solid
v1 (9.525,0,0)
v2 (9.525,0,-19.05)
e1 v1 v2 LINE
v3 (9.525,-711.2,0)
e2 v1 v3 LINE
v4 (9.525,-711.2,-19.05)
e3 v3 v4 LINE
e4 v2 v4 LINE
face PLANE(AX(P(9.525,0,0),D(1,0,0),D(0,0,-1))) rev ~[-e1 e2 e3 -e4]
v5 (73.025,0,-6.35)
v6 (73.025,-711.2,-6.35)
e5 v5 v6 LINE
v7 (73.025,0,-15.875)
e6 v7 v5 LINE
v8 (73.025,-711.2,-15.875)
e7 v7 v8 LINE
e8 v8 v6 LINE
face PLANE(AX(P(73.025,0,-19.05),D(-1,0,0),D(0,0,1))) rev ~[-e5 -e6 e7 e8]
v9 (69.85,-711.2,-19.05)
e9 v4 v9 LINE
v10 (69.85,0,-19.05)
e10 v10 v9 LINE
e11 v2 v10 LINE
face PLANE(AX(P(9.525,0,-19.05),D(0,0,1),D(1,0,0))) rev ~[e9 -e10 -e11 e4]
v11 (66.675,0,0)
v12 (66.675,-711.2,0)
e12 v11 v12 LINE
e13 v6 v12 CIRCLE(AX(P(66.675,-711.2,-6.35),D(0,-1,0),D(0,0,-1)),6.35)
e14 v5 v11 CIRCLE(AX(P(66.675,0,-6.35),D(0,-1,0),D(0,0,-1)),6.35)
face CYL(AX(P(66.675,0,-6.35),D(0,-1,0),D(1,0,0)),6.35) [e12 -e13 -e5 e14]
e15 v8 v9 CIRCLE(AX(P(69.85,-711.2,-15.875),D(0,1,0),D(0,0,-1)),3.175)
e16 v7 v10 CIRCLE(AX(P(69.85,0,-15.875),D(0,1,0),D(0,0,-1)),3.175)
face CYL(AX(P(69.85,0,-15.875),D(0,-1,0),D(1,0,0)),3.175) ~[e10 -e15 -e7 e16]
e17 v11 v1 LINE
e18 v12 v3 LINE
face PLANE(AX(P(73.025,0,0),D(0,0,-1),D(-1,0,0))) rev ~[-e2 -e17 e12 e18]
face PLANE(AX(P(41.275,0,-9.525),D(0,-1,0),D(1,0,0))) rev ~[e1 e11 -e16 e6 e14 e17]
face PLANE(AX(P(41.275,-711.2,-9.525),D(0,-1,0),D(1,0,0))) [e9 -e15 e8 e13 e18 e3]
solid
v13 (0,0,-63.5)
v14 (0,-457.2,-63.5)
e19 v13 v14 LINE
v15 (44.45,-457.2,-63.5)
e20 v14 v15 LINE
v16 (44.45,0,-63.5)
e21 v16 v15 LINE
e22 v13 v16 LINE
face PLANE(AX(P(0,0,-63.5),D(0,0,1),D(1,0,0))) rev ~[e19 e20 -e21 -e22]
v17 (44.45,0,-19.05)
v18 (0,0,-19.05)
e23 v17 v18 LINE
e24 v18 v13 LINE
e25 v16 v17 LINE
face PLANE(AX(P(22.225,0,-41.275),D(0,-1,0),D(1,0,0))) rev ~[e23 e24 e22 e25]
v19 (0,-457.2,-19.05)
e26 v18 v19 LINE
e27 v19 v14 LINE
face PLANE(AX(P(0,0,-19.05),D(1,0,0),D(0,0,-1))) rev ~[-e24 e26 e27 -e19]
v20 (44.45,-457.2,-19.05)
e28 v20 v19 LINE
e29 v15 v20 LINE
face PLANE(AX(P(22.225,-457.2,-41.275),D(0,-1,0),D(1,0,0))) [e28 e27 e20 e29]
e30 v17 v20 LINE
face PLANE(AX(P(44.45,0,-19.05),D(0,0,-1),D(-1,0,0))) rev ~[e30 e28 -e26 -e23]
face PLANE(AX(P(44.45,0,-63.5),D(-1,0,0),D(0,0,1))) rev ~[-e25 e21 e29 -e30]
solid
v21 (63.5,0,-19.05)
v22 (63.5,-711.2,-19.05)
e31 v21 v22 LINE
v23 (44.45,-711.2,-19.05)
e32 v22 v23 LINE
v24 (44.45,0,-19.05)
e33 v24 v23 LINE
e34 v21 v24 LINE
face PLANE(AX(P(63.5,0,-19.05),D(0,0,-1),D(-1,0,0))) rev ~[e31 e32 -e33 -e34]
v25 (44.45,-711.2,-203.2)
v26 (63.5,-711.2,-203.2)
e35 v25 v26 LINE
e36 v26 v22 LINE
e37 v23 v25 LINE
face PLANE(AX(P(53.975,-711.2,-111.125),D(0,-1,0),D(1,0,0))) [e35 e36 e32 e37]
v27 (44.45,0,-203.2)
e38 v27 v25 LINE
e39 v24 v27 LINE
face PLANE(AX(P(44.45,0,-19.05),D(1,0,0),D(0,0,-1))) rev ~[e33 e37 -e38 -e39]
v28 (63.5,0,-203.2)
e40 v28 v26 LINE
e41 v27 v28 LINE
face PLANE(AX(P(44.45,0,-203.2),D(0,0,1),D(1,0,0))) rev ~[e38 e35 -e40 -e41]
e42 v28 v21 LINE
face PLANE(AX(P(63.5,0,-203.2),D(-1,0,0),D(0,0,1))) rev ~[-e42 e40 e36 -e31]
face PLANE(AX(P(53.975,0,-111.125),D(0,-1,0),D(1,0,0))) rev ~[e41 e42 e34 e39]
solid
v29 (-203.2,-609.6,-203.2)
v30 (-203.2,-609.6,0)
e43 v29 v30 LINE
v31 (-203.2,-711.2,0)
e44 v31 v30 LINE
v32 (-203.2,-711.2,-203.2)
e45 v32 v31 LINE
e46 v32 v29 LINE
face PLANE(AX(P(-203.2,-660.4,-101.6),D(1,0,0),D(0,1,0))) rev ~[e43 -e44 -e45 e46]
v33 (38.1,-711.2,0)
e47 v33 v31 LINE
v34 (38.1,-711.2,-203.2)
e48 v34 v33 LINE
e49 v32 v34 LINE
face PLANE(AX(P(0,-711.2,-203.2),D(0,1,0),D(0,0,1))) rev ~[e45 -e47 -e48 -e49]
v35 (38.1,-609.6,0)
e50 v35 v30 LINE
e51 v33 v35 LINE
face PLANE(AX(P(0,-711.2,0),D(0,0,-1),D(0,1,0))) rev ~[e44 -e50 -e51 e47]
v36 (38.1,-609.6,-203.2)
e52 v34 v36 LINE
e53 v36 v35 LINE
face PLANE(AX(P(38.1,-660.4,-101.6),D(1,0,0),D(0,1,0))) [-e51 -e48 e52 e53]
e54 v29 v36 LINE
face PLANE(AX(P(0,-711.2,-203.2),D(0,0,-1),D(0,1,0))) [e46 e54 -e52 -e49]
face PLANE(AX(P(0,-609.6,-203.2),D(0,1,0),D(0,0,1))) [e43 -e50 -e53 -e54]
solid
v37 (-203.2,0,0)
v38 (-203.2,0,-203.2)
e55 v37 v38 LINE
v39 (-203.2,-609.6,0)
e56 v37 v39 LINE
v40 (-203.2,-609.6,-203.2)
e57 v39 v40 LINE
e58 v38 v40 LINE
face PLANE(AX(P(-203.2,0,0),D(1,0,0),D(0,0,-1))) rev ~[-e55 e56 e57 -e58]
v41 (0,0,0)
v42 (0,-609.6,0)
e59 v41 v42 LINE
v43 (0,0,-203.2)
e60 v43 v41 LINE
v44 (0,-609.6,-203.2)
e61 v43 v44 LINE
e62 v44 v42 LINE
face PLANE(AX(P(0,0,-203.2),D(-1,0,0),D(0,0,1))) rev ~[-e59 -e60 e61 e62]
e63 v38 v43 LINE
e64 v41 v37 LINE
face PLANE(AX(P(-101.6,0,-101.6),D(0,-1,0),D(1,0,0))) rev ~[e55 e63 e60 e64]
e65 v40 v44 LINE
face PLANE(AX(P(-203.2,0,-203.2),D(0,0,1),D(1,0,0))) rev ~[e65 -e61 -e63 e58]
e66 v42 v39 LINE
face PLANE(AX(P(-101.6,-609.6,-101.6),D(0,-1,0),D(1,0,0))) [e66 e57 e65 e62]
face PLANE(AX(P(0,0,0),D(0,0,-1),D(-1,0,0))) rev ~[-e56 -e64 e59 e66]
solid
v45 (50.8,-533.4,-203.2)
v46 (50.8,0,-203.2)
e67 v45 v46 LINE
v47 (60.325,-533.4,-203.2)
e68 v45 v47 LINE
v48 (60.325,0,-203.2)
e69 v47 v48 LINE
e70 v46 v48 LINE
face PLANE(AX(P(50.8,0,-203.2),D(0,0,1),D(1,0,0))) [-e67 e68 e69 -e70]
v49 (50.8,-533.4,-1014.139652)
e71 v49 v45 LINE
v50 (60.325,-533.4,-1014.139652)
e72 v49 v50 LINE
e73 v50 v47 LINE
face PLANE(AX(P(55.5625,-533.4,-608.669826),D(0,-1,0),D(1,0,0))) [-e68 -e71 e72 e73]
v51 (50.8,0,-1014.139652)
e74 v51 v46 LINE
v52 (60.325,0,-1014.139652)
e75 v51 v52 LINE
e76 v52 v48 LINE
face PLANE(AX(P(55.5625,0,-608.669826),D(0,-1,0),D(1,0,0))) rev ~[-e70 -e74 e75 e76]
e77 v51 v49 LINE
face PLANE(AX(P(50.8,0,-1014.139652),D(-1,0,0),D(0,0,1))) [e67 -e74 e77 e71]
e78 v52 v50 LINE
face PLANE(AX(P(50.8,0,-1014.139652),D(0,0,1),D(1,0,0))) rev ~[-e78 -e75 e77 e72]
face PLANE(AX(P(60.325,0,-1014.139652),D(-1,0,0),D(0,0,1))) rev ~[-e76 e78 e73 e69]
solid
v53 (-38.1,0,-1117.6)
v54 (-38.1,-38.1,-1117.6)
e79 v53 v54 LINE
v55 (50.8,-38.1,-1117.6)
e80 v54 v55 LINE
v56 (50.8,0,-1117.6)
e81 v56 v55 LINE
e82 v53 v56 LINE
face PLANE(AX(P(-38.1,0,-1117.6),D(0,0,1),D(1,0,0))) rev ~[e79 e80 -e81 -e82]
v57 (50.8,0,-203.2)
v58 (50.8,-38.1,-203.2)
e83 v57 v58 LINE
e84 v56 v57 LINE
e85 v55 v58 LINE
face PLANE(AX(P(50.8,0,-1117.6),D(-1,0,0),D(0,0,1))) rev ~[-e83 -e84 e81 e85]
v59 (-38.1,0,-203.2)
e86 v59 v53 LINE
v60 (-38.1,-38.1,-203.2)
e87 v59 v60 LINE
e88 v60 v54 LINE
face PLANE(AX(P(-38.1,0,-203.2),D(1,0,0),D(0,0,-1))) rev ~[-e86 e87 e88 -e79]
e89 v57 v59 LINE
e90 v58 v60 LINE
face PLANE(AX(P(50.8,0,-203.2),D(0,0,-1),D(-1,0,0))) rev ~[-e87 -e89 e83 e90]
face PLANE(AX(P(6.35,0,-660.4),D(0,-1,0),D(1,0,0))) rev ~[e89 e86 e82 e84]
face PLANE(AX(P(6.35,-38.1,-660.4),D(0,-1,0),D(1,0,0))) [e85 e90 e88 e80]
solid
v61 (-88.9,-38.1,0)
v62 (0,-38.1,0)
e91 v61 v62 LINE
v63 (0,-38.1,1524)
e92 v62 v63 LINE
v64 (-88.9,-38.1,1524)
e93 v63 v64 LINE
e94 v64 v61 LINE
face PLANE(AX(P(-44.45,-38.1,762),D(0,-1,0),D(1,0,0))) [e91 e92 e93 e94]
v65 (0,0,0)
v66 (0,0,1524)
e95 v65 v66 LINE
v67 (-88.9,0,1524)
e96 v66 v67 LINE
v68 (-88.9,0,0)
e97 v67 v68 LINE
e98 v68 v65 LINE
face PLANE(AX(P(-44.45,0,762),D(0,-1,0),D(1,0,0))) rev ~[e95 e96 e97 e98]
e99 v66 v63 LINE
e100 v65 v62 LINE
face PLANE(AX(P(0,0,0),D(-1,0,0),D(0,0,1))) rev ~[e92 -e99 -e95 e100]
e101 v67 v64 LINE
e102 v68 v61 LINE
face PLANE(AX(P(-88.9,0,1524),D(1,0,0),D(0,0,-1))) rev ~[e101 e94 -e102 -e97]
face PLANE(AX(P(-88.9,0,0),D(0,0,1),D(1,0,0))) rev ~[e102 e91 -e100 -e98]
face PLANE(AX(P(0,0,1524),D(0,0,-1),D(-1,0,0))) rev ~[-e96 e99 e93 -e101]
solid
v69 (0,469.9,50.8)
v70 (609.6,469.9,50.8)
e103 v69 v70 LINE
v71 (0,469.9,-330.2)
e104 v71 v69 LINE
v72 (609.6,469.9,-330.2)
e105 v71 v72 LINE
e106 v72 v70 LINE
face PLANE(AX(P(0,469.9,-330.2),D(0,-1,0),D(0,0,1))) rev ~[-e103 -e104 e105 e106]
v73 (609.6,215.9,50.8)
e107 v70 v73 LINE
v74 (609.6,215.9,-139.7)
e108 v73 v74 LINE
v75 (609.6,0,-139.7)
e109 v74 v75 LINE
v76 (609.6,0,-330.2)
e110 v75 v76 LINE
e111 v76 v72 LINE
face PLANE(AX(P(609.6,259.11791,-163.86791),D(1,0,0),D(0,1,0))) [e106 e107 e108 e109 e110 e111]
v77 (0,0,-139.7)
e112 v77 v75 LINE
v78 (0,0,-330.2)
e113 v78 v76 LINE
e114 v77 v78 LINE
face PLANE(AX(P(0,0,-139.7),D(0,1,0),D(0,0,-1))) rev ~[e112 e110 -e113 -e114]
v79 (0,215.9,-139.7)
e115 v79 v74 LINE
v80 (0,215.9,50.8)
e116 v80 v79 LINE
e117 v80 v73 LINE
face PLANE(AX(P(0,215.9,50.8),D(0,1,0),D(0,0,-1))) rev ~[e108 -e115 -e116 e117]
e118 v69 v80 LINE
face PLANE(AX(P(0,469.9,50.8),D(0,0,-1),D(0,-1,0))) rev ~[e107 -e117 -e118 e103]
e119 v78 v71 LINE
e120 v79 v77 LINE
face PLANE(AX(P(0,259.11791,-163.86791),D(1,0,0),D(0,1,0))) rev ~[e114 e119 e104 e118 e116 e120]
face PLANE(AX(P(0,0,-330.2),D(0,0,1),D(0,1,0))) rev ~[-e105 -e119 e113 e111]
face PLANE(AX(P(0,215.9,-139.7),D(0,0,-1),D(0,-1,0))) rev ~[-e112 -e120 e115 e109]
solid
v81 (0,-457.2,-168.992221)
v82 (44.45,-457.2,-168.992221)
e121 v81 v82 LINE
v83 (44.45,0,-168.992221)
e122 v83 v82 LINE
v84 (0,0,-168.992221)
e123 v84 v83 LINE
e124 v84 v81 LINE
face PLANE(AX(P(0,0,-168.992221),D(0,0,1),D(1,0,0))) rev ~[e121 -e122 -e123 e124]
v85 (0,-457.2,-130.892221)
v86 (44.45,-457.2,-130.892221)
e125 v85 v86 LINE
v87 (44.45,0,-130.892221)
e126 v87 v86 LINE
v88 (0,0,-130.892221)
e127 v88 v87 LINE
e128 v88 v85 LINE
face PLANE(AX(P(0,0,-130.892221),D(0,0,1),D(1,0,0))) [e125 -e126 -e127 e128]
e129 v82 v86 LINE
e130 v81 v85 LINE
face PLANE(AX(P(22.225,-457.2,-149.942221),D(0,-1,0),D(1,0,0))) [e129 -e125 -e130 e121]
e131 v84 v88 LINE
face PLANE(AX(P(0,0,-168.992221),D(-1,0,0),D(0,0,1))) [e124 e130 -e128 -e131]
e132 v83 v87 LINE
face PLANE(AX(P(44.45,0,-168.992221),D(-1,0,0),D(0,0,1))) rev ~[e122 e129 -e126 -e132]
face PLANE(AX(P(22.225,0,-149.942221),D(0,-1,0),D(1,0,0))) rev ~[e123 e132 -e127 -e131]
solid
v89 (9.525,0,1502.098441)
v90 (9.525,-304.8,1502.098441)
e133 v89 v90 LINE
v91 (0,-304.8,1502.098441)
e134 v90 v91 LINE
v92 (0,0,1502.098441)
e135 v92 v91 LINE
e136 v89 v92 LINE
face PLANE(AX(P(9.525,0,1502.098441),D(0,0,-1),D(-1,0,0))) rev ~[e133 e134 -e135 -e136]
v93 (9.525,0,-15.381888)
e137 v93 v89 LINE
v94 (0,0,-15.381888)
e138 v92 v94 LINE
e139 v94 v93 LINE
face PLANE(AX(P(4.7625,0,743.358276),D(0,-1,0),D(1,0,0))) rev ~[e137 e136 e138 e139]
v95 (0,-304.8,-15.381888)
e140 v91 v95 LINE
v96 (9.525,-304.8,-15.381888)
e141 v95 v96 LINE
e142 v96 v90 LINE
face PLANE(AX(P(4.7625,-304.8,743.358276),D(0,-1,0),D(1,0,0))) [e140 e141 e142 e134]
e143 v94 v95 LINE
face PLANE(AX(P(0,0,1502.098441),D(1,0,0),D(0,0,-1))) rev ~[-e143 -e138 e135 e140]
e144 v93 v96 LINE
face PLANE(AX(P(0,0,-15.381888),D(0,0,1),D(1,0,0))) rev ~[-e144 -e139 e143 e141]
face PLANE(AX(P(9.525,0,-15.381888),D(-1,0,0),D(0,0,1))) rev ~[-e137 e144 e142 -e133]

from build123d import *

# Parameters (mm, degrees)
F1_DEPTH      = 38.1
F2_DEPTH      = 304.8
F0_W          = 9.525
F0_H          = 810.9396522522
F3_DEPTH      = 609.6
F4_DEPTH      = 457.2
F0_W_2        = 44.45
F0_H_2        = 38.1
F5_W          = 101.6
F5_H          = 203.2
F6_DEPTH      = 38.1
F6_DEPTH_BACK = 203.2
F7_DEPTH      = 711.2
F8_DEPTH      = 711.2
F9_DEPTH      = 533.4
F11_DEPTH     = 609.6
F12_R         = 6.35
F13_R         = 3.175


with BuildPart() as f1:
    # F0 (on Front) → F1 (new body)
    with BuildSketch(Plane.XZ):
        Polygon((-88.9, 0), (0, 0), (0, 1502.098441124), (0, 1524), (-88.9, 1524), align=None)
    extrude(amount=F1_DEPTH)


with BuildPart() as f1b:
    # F0 (on Front) → F1, piece 2 (new body)
    with BuildSketch(Plane.XZ):
        Polygon((0, -203.2), (-38.1, -203.2), (-38.1, -1117.6), (50.8, -1117.6), (50.8, -1014.1396522522), (50.8, -203.2), (44.45, -203.2), align=None)
    extrude(amount=F1_DEPTH)


with BuildPart() as f2:
    # F0 (on Front) → F2 (new body)
    with BuildSketch(Plane.XZ):
        Polygon((0, 1502.098441124), (0, 0), (0, -15.3818884864), (9.525, -15.3818884864), (9.525, 0), (9.525, 1502.098441124), align=None)
    extrude(amount=F2_DEPTH)


with BuildPart() as f2b:
    # F0 (on Front) → F2, piece 2 (new body)
    with BuildSketch(Plane.XZ):
        with Locations((55.5625, -608.6698261261)):
            Rectangle(F0_W, F0_H)
    extrude(amount=F2_DEPTH)

    # F0 (on Front) → F9 (join)
    with BuildSketch(Plane.XZ):
        with Locations((55.5625, -608.6698261261)):
            Rectangle(F0_W, F0_H)
    extrude(amount=F9_DEPTH)


with BuildPart() as f3:
    # F0 (on Front) → F3 (new body)
    with BuildSketch(Plane.XZ):
        Polygon((0, -15.3818884864), (0, 0), (-88.9, 0), (-203.2, 0), (-203.2, -203.2), (-38.1, -203.2), (0, -203.2), (0, -168.9922213554), (0, -130.8922213554), (0, -63.5), (0, -19.05), align=None)
    extrude(amount=F3_DEPTH)


with BuildPart() as f4:
    # F0 (on Front) → F4 (new body)
    with BuildSketch(Plane.XZ):
        Polygon((9.525, -19.05), (0, -19.05), (0, -63.5), (44.45, -63.5), (44.45, -19.05), align=None)
    extrude(amount=F4_DEPTH)


with BuildPart() as f4b:
    # F0 (on Front) → F4, piece 2 (new body)
    with BuildSketch(Plane.XZ):
        with Locations((22.225, -149.9422213554)):
            Rectangle(F0_W_2, F0_H_2)
    extrude(amount=F4_DEPTH)


with BuildPart() as f6:
    # F5 (on face) → F6 (new body, two sides)
    with BuildSketch(Plane.YZ) as f6_sk:
        with Locations((-660.4, -101.6)):
            Rectangle(F5_W, F5_H)
    extrude(amount=F6_DEPTH)
    extrude(f6_sk.sketch, amount=-F6_DEPTH_BACK)


with BuildPart() as f7:
    # F0 (on Front) → F7 (new body, through all)
    with BuildSketch(Plane.XZ):
        Polygon((44.45, -19.05), (44.45, -63.5), (44.45, -130.8922213554), (44.45, -168.9922213554), (44.45, -203.2), (50.8, -203.2), (60.325, -203.2), (63.5, -203.2), (63.5, -19.05), align=None)
    extrude(amount=F7_DEPTH)


with BuildPart() as f8:
    # F0 (on Front) → F8 (new body, through all)
    with BuildSketch(Plane.XZ):
        Polygon((9.525, 0), (9.525, -15.3818884864), (9.525, -19.05), (44.45, -19.05), (63.5, -19.05), (73.025, -19.05), (73.025, 0), align=None)
    extrude(amount=F8_DEPTH)

    # F12
    f12_edges = [f8.edges().sort_by_distance(p)[0] for p in [
        (73.025, -355.6, 0),
    ]]
    fillet(f12_edges, radius=F12_R)

    # F13
    f13_edges = [f8.edges().sort_by_distance(p)[0] for p in [
        (73.025, -355.6, -19.05),
    ]]
    fillet(f13_edges, radius=F13_R)


with BuildPart() as f11:
    # F10 (on Right) → F11 (new body)
    with BuildSketch(Plane.YZ):
        Polygon((215.9, -139.7), (0, -139.7), (0, -330.2), (469.9, -330.2), (469.9, 50.8), (215.9, 50.8), align=None)
    extrude(amount=F11_DEPTH)


solid = Compound([f1.part, f1b.part, f2.part, f2b.part, f3.part, f4.part, f4b.part, f6.part, f7.part, f8.part, f11.part])
